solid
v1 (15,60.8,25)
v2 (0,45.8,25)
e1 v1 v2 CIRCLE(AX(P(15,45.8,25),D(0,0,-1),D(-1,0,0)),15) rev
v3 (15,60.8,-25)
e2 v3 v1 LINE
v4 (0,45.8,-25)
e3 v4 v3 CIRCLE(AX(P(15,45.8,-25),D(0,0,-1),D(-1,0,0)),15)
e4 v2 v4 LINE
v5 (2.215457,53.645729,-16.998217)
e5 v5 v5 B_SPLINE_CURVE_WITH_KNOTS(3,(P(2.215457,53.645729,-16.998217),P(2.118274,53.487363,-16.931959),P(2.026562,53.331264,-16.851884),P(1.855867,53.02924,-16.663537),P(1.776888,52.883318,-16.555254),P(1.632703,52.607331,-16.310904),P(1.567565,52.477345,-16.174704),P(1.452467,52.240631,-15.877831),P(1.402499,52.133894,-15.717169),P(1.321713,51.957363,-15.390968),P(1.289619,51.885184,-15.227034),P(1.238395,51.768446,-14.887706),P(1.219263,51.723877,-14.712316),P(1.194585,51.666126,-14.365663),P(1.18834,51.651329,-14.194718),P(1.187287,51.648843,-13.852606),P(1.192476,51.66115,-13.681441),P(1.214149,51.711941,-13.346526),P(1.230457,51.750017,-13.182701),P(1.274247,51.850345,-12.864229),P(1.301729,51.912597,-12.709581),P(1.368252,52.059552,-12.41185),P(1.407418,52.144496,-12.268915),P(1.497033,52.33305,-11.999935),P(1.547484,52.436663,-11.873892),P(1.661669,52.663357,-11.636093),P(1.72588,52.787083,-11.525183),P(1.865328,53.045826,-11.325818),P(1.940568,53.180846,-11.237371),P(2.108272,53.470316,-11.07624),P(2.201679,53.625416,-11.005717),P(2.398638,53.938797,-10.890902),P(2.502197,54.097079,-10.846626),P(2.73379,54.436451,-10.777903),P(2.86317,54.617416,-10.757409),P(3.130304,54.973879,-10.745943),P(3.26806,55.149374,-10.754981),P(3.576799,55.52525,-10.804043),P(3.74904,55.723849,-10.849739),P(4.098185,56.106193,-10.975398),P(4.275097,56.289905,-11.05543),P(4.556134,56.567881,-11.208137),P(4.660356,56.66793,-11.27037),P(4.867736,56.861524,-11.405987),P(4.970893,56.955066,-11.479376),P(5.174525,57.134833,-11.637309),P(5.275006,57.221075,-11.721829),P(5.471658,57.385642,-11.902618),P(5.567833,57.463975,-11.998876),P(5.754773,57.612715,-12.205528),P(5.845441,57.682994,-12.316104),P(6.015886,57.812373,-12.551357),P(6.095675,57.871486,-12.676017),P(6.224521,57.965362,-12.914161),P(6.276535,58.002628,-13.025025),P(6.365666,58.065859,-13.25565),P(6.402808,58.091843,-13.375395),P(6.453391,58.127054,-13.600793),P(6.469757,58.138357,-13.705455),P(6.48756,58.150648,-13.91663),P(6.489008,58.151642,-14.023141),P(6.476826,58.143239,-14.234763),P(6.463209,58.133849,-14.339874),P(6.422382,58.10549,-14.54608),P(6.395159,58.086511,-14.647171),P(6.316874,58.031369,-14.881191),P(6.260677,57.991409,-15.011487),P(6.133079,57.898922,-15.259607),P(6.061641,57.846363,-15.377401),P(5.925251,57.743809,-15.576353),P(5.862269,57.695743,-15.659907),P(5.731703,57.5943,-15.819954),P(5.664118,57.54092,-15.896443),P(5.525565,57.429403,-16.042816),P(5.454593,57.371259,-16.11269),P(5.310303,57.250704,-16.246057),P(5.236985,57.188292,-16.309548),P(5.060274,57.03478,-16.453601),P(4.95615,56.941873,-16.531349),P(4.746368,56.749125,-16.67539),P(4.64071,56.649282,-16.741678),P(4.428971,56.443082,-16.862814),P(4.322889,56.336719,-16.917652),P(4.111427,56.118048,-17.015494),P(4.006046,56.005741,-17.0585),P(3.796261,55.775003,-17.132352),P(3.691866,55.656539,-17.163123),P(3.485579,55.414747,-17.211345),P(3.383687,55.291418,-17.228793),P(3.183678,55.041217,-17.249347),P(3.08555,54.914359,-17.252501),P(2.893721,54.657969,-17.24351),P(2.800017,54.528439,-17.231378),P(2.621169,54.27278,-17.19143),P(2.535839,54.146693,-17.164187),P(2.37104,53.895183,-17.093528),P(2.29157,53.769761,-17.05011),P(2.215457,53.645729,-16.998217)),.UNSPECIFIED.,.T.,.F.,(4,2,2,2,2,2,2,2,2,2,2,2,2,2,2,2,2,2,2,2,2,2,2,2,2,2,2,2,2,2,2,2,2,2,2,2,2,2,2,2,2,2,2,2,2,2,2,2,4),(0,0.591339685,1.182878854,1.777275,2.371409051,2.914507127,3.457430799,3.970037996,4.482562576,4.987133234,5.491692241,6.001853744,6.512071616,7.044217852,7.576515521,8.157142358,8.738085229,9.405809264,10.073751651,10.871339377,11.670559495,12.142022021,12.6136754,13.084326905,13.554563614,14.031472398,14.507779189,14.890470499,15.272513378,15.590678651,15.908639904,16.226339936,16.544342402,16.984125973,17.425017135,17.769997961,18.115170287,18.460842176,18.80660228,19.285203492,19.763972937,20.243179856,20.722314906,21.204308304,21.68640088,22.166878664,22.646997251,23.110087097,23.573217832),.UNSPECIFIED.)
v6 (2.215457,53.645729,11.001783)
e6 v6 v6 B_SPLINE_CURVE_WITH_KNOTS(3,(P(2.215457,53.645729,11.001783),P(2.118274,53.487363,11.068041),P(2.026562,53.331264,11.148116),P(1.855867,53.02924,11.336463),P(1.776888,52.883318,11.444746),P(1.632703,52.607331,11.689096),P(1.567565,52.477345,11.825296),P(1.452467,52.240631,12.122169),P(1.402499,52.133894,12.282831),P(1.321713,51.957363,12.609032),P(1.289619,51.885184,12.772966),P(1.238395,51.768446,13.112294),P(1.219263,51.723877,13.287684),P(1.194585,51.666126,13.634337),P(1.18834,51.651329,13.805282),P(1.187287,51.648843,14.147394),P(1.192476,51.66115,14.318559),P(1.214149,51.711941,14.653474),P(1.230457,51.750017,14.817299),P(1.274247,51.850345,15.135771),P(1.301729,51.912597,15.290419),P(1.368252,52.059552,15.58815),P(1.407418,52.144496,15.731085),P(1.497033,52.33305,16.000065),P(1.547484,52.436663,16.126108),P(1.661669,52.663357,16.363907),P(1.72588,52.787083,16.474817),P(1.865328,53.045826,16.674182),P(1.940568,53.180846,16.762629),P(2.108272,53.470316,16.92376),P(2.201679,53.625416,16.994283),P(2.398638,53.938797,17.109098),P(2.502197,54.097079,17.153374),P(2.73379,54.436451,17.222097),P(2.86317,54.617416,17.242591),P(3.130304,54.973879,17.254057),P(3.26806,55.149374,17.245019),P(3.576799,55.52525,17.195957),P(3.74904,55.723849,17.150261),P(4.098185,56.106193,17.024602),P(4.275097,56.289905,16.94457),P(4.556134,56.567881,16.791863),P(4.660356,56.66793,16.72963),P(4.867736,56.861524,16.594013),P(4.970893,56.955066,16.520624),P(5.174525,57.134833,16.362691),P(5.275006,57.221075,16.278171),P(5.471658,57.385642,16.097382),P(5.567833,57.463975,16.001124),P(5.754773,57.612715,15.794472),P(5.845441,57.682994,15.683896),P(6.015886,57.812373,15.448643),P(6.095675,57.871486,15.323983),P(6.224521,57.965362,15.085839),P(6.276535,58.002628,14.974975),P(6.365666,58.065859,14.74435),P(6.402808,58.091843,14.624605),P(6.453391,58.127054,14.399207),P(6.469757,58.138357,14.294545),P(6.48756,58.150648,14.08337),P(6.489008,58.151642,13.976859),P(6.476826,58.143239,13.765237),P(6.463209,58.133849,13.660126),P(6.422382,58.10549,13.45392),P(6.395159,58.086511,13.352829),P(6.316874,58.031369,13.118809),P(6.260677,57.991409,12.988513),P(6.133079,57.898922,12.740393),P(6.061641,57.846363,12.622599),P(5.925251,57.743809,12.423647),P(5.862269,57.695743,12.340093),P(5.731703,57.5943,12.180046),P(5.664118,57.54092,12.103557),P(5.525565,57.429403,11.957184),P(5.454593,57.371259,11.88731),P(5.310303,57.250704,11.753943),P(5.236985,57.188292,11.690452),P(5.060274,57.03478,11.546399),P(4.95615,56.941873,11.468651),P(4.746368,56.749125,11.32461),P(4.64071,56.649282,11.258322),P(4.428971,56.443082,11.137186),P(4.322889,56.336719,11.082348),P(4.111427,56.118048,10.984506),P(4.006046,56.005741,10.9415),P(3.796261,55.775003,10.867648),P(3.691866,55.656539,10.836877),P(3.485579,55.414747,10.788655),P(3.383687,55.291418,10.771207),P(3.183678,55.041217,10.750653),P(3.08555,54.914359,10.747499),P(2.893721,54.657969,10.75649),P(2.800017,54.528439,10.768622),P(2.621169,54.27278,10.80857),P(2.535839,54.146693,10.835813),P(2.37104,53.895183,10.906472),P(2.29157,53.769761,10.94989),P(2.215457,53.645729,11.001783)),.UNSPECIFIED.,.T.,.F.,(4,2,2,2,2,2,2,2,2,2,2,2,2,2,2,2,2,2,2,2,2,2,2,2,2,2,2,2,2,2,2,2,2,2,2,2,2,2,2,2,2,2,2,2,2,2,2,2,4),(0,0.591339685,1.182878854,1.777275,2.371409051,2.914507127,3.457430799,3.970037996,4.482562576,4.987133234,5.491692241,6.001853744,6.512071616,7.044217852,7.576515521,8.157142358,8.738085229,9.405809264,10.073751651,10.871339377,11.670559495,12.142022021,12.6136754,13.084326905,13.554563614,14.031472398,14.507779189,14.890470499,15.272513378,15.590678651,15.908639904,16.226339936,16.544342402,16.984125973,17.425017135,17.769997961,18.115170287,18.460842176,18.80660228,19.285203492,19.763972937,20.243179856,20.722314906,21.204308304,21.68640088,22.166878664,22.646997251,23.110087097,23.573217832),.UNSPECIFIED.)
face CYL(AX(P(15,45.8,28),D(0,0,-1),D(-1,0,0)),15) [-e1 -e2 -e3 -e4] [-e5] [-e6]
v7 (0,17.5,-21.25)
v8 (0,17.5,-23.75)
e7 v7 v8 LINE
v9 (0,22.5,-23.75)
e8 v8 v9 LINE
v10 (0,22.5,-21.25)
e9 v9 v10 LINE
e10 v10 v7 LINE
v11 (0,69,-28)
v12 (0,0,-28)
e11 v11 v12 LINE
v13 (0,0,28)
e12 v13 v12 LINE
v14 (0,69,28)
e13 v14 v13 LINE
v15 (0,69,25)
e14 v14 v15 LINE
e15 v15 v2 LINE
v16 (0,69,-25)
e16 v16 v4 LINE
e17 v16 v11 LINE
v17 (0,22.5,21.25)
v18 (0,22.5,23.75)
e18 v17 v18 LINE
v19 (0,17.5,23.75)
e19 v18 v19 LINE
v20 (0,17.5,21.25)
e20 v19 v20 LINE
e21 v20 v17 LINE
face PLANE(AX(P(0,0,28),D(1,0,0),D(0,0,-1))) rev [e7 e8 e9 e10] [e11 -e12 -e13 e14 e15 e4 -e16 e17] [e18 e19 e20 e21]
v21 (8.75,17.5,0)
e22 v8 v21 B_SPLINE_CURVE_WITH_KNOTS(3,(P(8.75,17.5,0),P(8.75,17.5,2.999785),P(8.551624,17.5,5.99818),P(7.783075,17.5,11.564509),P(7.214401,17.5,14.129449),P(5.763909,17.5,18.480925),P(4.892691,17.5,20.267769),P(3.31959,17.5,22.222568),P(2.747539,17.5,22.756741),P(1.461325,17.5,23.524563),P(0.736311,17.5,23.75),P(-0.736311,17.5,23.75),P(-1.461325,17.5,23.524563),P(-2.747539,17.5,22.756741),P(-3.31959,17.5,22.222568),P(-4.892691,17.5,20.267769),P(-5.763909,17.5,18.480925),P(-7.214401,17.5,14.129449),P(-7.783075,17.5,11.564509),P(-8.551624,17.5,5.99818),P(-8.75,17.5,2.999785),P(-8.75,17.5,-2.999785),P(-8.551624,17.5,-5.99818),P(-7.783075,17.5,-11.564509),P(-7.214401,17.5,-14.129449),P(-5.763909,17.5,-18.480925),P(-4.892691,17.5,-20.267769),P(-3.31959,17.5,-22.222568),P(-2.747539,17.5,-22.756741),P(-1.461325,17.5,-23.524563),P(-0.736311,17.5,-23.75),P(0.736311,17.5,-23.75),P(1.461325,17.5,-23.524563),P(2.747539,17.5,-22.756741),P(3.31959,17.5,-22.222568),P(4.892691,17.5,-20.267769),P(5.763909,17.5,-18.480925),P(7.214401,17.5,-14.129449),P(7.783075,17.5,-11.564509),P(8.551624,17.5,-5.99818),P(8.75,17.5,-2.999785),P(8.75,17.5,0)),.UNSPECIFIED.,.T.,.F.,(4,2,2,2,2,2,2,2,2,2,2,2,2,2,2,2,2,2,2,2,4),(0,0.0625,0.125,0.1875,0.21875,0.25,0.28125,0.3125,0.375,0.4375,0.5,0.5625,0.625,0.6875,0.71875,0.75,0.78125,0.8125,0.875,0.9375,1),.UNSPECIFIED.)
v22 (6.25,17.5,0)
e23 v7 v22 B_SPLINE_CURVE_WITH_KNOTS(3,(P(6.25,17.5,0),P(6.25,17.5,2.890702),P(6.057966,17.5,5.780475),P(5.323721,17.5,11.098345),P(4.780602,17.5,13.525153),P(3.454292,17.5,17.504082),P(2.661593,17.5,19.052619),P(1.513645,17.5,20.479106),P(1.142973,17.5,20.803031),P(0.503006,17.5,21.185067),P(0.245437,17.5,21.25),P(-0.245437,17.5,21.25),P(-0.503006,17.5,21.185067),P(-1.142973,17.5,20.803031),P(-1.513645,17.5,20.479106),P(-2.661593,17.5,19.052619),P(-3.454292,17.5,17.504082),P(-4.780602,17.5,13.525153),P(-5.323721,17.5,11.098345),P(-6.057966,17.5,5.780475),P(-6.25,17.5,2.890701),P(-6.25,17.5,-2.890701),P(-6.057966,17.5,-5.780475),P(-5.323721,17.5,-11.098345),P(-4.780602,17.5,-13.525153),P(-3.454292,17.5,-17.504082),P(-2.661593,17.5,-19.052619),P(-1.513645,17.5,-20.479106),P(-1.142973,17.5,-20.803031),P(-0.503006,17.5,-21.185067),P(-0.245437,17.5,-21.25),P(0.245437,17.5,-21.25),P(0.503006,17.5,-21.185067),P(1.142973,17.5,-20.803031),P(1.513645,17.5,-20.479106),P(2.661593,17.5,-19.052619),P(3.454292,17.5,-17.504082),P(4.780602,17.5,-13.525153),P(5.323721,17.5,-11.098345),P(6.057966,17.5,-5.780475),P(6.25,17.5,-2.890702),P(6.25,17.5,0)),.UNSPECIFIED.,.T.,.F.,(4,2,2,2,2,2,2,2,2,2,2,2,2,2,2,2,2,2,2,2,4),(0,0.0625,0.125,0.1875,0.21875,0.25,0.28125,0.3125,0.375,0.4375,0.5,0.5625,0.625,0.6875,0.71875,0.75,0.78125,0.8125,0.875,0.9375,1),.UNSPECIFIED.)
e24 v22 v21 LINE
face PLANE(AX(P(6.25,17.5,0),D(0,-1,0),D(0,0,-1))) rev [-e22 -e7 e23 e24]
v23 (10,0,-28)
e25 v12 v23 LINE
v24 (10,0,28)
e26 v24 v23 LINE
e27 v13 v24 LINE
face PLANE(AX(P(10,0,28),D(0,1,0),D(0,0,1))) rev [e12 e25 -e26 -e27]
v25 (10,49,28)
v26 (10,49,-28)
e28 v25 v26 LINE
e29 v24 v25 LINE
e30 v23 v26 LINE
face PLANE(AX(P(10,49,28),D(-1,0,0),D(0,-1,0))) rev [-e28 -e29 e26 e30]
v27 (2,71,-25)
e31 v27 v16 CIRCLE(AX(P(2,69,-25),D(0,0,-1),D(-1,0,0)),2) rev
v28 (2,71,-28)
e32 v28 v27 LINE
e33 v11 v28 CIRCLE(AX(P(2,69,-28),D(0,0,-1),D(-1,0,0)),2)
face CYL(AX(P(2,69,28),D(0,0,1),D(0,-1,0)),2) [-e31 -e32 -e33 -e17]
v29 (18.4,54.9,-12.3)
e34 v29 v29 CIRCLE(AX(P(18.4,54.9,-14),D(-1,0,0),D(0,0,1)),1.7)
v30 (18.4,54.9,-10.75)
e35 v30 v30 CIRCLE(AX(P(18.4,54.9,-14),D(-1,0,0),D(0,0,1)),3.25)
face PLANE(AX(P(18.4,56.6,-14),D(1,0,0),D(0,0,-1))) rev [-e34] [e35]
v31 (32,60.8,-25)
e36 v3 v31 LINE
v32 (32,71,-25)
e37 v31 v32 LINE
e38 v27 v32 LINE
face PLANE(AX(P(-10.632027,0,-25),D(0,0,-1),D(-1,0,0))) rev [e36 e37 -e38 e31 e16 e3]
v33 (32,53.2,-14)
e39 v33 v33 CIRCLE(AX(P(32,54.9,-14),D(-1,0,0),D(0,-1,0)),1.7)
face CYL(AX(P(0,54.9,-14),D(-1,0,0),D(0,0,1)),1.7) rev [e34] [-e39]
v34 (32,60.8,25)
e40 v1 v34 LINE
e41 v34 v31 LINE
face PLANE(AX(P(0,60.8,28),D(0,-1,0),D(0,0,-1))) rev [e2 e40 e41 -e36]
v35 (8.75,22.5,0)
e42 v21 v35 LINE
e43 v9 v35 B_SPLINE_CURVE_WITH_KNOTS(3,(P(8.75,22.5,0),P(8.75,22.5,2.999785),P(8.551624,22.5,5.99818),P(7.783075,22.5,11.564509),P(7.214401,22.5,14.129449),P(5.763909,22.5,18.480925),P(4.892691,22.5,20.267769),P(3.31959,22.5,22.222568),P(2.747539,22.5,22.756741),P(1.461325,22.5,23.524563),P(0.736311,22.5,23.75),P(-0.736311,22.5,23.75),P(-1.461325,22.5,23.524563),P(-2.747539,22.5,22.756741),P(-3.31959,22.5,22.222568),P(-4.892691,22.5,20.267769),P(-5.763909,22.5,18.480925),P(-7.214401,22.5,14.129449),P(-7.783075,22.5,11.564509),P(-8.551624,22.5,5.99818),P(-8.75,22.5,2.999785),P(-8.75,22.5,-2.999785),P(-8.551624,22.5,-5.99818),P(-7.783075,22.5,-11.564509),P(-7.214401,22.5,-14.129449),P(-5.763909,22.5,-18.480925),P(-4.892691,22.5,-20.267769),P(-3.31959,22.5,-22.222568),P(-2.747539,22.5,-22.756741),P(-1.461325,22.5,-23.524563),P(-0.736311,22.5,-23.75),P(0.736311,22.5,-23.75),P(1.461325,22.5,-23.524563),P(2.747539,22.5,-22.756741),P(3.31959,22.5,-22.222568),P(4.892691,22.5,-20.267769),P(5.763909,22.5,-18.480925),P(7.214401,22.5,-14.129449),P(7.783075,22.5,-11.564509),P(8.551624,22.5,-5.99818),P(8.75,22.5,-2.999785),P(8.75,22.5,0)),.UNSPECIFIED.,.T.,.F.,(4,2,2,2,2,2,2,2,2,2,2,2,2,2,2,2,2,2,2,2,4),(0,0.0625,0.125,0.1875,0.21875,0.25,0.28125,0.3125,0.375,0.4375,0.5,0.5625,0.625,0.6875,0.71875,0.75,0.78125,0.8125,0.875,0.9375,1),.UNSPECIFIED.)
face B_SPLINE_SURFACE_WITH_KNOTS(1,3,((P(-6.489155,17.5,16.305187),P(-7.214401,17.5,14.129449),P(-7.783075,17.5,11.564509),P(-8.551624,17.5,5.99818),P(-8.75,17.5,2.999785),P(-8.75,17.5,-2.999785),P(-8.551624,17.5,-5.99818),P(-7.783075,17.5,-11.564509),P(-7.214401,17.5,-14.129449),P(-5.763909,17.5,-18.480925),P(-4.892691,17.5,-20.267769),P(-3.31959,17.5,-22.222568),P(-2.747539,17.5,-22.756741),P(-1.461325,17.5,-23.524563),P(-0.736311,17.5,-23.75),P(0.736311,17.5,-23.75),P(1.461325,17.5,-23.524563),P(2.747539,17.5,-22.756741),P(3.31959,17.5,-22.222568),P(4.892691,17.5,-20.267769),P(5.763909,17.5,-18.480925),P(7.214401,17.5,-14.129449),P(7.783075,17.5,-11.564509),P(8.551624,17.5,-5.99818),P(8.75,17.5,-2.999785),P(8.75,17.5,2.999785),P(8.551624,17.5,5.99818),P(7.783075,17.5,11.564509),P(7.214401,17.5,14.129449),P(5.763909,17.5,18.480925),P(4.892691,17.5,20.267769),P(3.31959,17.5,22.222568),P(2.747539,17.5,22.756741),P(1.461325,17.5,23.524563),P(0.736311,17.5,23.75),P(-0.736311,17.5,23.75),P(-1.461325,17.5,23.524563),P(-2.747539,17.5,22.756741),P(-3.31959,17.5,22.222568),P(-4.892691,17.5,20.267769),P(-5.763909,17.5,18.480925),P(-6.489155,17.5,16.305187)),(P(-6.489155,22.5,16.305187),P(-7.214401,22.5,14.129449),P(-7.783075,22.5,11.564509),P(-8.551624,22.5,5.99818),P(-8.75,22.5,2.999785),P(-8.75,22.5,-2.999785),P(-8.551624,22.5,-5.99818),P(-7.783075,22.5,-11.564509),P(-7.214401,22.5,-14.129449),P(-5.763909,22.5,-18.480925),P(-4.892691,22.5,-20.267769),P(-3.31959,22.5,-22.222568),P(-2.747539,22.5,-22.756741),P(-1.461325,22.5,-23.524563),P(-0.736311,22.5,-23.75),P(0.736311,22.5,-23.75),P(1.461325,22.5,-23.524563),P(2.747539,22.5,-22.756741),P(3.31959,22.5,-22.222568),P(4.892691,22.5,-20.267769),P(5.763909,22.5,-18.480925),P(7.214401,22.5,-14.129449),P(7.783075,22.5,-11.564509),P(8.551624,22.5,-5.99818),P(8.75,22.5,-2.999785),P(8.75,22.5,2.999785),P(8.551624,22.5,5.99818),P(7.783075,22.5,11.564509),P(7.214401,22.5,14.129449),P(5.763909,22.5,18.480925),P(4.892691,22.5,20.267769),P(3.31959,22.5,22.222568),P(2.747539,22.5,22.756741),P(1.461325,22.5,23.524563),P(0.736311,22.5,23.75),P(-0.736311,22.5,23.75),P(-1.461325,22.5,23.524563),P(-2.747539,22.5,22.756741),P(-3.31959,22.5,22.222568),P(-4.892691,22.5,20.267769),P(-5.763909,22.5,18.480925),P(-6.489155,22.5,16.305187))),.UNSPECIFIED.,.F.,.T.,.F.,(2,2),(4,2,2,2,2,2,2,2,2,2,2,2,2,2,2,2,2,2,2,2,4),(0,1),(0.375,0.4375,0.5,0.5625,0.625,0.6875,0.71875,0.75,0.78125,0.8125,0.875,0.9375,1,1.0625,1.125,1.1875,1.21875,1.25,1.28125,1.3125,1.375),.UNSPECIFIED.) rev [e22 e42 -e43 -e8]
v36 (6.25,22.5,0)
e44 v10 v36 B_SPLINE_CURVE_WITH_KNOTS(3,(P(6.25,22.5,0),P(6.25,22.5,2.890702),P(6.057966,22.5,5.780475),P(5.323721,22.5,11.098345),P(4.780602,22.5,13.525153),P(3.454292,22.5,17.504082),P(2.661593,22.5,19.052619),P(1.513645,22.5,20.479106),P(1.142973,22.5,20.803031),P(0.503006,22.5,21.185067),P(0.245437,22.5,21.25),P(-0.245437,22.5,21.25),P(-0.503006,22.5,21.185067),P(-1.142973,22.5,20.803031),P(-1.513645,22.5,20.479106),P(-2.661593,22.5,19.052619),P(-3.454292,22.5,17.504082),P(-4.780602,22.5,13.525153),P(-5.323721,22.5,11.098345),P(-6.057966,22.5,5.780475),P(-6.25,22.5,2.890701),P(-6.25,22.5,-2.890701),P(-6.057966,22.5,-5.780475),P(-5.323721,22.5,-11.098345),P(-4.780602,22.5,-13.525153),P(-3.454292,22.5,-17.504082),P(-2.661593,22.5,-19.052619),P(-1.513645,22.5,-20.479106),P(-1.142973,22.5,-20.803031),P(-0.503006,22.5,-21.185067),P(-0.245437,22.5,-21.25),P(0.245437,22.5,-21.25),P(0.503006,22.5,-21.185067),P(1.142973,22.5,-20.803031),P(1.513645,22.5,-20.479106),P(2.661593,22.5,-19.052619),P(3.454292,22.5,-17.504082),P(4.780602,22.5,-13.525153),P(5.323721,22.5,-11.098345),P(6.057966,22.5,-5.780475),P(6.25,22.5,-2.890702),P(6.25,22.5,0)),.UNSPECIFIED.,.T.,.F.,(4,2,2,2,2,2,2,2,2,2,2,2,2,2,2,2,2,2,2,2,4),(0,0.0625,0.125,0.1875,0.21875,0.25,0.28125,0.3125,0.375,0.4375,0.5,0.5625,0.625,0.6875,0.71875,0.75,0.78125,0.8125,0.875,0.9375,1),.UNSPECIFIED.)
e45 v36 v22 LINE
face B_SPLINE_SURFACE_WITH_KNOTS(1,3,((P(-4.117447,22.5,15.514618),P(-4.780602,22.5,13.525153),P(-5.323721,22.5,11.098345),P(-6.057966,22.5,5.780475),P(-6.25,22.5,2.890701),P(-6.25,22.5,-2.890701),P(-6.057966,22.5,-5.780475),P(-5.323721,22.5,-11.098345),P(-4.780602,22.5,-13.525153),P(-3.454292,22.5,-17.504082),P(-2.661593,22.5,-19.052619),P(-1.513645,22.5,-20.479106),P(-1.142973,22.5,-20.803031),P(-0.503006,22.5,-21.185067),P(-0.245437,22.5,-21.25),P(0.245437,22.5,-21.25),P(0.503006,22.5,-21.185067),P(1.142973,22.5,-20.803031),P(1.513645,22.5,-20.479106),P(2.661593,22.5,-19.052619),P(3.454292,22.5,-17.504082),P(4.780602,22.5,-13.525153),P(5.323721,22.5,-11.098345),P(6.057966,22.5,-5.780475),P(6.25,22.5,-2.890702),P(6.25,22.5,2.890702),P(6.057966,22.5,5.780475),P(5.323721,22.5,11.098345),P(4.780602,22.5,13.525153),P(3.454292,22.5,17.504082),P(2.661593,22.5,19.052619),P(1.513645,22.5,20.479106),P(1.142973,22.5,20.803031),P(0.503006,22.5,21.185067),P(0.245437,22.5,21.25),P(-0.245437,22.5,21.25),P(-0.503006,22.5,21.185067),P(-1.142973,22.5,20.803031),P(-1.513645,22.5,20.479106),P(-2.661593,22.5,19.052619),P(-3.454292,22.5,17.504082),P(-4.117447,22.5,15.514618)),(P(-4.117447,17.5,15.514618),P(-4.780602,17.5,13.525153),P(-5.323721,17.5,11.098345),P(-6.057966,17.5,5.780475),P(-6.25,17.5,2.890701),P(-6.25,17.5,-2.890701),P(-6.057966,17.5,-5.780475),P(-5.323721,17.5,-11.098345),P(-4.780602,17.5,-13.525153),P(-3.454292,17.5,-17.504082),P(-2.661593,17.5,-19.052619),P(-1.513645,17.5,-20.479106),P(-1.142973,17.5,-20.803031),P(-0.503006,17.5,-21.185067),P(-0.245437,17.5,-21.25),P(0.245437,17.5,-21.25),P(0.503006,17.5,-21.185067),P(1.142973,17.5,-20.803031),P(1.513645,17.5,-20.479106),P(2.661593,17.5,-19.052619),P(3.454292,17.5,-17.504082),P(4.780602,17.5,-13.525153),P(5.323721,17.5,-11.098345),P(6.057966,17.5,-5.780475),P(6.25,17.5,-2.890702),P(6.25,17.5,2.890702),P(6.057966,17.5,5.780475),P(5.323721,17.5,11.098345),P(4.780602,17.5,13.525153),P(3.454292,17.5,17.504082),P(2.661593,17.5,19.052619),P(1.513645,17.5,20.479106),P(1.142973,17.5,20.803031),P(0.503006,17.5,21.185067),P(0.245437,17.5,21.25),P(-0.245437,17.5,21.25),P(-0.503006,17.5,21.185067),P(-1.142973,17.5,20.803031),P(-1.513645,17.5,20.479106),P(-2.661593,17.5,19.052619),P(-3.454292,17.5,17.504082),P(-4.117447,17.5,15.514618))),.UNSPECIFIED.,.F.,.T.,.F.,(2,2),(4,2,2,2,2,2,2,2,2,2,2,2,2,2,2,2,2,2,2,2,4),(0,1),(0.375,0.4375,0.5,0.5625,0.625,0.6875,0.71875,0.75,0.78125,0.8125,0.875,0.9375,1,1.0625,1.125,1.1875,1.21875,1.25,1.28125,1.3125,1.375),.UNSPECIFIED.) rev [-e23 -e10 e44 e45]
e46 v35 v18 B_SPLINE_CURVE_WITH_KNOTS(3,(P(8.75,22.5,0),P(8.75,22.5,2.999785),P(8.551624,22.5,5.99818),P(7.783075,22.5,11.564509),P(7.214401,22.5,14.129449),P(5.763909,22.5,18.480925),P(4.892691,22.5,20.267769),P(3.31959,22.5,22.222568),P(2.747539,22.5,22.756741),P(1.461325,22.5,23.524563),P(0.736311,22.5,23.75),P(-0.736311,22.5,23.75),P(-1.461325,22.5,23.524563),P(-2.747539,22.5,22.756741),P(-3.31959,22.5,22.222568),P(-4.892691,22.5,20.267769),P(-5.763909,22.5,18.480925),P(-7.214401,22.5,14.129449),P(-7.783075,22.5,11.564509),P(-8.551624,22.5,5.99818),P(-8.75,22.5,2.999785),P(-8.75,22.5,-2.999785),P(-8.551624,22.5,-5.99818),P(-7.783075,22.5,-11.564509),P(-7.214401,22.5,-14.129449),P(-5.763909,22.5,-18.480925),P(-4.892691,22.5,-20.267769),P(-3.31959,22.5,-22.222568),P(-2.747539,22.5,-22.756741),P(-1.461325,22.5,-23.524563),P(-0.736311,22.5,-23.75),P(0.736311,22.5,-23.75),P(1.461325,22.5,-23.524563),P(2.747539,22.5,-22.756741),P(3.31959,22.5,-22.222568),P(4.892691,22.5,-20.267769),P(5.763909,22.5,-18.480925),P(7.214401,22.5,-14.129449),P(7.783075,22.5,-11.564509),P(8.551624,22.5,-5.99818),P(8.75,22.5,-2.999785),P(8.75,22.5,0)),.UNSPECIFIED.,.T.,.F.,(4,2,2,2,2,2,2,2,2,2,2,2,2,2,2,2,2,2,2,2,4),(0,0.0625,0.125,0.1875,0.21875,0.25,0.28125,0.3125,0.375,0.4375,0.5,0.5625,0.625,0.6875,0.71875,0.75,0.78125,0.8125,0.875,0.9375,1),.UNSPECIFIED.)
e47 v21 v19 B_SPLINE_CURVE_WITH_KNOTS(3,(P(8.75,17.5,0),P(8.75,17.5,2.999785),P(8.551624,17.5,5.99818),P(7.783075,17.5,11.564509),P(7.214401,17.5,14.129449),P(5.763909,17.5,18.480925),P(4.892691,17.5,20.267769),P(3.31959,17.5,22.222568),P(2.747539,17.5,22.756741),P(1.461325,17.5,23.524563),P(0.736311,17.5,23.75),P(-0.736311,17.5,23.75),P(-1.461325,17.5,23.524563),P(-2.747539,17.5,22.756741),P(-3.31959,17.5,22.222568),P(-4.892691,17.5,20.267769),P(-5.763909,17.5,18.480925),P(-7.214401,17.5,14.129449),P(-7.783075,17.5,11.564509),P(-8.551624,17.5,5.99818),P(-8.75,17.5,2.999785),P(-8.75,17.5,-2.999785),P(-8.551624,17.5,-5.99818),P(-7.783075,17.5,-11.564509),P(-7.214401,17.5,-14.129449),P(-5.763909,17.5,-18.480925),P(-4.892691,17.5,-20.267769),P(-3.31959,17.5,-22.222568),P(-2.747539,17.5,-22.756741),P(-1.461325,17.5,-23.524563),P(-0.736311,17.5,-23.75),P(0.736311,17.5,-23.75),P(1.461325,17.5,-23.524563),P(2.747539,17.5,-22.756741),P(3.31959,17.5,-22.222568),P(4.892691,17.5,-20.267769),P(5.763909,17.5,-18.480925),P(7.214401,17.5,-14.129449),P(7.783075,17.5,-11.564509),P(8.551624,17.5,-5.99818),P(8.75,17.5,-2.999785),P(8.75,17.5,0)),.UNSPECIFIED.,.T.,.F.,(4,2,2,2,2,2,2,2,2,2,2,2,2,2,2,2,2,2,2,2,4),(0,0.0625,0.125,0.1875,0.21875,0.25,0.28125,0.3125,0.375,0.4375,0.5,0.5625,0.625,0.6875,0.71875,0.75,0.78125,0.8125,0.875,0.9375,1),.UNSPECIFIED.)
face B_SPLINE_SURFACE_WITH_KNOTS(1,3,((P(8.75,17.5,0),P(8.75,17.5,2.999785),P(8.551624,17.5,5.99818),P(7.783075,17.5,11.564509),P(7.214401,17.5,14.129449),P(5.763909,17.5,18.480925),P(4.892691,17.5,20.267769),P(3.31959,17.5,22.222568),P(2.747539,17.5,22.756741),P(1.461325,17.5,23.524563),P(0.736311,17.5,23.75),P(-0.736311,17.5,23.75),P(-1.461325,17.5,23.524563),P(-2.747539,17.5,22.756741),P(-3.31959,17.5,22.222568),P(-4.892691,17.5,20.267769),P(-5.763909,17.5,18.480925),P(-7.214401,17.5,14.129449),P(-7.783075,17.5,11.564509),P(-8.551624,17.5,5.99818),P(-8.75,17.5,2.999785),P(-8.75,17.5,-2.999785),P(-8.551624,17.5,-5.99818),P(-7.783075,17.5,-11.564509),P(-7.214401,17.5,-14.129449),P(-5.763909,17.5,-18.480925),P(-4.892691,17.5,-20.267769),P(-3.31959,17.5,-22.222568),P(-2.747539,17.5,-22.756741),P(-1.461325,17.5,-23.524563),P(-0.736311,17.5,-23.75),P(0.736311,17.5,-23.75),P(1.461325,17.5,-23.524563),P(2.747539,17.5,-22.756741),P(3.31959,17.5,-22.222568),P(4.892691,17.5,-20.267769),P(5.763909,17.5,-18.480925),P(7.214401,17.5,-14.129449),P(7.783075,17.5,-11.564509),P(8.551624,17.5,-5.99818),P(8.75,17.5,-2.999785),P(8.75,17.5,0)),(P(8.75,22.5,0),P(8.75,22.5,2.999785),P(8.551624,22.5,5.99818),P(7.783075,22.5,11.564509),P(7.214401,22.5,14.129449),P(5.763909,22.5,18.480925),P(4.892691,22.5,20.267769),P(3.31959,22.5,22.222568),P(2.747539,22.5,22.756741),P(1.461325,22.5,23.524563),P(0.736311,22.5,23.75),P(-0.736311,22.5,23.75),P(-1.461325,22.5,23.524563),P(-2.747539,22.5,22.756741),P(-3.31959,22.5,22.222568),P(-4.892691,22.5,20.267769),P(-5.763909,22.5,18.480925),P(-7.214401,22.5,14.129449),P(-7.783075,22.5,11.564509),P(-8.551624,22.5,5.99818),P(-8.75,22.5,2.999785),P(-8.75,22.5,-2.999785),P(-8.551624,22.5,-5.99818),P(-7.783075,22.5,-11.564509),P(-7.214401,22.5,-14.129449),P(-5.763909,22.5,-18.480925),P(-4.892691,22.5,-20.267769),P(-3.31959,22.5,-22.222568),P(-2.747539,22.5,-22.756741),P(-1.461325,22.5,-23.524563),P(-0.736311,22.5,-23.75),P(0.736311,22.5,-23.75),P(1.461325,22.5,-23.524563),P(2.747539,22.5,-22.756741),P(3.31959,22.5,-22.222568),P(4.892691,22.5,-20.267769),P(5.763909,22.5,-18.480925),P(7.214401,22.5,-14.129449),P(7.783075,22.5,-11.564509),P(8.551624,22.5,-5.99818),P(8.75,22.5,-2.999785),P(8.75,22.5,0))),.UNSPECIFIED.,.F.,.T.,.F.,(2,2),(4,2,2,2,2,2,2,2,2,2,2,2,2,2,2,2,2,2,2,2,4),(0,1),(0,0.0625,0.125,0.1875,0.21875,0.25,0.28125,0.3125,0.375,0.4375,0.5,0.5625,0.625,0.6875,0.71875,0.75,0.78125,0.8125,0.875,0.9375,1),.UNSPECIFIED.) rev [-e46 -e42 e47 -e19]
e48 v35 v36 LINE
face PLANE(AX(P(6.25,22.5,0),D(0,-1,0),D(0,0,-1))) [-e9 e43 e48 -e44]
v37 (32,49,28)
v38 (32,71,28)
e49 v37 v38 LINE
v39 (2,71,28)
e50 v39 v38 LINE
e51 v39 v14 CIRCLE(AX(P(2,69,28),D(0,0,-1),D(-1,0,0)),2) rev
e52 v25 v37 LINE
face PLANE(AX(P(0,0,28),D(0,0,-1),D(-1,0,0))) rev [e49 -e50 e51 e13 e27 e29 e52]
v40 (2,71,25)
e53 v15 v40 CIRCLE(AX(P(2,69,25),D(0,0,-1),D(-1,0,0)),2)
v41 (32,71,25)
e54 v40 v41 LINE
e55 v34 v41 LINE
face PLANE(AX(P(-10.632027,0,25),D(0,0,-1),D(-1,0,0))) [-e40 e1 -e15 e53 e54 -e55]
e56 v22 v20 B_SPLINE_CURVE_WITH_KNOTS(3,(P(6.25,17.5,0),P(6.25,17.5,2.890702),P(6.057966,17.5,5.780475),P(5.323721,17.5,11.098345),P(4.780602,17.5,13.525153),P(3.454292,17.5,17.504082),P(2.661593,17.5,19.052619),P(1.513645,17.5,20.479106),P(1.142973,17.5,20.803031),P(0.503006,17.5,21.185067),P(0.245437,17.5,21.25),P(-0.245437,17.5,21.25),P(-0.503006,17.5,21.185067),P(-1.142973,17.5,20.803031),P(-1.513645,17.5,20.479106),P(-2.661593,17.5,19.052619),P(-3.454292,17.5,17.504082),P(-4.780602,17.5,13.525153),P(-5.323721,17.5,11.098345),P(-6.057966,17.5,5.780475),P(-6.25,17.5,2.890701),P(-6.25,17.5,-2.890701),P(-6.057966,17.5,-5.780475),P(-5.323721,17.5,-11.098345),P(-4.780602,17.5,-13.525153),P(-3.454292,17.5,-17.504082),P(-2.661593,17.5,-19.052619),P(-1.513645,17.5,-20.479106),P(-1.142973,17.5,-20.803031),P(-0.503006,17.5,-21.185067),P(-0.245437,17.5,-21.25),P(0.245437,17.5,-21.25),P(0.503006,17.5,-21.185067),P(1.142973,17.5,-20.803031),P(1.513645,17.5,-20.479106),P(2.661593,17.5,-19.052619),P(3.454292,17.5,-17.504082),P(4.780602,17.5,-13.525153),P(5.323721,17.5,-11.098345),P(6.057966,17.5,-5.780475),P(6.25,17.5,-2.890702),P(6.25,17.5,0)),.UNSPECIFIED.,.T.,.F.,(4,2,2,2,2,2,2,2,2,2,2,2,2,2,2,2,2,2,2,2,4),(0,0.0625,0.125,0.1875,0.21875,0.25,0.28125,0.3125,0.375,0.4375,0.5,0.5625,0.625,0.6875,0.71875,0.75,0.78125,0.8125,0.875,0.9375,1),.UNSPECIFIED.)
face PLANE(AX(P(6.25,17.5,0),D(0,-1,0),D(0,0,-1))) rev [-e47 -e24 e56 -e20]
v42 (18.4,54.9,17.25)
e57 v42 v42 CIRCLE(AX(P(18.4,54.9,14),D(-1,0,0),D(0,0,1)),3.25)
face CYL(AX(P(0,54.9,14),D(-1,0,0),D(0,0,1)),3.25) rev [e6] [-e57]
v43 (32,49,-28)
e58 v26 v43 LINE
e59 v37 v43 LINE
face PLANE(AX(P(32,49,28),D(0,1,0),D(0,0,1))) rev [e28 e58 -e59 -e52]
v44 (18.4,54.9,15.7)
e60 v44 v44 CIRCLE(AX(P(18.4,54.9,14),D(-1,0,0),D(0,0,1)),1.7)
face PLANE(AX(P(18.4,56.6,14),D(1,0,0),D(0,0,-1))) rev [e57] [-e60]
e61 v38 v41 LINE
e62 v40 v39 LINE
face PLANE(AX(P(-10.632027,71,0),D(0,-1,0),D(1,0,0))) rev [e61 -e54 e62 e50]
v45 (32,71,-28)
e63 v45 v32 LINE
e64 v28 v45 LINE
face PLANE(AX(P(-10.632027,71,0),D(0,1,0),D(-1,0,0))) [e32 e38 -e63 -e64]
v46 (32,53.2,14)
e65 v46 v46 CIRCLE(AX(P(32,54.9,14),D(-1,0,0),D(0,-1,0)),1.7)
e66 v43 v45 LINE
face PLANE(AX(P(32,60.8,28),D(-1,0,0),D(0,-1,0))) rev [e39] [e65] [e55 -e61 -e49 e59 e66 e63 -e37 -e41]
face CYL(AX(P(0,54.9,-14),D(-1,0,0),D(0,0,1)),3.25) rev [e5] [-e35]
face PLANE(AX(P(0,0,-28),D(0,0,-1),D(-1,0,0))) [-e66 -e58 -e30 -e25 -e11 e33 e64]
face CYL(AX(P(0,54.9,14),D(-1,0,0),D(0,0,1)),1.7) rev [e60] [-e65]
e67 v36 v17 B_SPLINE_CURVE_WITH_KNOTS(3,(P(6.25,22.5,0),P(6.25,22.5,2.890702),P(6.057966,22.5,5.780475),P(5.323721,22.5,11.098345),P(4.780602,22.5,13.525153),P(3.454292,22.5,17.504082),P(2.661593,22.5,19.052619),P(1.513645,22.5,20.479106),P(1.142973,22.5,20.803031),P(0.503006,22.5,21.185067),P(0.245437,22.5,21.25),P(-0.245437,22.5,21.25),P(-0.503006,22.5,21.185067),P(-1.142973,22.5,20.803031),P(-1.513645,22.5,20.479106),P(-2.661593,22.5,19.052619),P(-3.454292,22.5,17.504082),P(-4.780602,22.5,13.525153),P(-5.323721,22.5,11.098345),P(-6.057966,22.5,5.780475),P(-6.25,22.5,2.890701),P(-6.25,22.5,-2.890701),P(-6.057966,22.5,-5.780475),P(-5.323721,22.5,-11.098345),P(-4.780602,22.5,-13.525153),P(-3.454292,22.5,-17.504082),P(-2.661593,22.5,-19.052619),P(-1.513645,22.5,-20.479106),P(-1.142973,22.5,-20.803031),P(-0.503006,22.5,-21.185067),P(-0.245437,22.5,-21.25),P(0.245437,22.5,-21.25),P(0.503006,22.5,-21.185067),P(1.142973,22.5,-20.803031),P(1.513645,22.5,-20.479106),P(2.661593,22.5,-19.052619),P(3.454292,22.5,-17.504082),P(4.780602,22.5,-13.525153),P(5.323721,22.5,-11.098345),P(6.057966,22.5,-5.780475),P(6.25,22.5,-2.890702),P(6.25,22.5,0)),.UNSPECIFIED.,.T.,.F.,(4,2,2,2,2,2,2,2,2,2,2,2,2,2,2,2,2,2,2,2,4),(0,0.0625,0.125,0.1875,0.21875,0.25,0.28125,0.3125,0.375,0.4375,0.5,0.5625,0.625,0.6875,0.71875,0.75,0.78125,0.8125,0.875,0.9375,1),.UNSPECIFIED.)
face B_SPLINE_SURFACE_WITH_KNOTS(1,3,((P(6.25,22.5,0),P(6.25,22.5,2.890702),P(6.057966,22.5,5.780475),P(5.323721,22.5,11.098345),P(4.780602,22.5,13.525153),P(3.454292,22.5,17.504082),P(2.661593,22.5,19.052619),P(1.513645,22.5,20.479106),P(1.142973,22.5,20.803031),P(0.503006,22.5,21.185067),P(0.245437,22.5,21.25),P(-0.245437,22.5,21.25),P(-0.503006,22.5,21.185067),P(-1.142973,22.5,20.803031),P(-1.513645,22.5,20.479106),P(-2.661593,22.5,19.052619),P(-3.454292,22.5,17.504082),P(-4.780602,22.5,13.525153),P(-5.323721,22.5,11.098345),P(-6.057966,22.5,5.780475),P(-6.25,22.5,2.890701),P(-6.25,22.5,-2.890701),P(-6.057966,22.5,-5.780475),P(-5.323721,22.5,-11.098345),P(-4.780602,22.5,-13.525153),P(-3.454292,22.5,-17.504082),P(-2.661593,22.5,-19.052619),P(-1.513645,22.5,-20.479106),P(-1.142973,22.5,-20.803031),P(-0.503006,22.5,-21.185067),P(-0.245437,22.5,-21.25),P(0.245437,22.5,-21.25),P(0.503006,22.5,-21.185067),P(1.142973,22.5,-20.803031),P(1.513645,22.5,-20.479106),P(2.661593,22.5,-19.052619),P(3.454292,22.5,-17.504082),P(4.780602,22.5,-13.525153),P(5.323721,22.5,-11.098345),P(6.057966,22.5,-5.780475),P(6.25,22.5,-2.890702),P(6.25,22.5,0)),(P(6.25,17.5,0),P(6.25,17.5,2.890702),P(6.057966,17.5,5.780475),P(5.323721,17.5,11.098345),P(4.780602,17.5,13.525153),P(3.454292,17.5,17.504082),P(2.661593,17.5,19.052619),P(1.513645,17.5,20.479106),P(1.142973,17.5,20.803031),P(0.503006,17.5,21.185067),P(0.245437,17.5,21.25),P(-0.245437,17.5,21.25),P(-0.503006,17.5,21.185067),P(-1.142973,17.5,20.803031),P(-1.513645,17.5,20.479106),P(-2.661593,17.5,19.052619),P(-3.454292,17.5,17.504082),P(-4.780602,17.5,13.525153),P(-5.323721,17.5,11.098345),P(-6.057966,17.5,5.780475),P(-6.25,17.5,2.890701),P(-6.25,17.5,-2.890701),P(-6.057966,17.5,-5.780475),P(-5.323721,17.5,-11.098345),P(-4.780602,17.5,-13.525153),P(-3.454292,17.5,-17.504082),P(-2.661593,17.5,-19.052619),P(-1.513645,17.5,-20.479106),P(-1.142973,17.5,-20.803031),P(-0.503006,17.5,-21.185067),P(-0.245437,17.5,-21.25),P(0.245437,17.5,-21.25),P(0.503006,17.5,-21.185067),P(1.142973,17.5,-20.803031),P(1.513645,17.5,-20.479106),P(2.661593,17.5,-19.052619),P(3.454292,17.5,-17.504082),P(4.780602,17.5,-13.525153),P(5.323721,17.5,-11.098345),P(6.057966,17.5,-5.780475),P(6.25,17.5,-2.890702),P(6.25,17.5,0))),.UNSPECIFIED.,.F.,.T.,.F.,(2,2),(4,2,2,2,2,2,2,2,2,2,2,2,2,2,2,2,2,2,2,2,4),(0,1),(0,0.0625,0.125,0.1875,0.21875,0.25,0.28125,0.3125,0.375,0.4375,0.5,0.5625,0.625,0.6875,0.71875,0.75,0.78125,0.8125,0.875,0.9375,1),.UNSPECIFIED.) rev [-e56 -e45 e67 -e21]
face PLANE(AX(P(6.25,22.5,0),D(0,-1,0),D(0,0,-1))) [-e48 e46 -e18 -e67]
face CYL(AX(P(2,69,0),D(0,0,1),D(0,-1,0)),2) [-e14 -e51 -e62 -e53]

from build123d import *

# Parameters (mm, degrees)
BOSS_EXTRUDE1_DEPTH                                 = 28
CBORE_FOR_M3_HEX_SOCKET_HEAD_CAP_SCREW1_D           = 3.4
CBORE_FOR_M3_HEX_SOCKET_HEAD_CAP_SCREW1_CBORE_D     = 6.5
CBORE_FOR_M3_HEX_SOCKET_HEAD_CAP_SCREW1_CBORE_DEPTH = 18.4
SKETCH5_W                                           = 3
SKETCH5_H                                           = 10.2
BOSS_EXTRUDE3_DEPTH                                 = 32
FILLET1_R                                           = 15
CUT_SWEEP1_START                                    = 17.5
CUT_SWEEP1_DEPTH                                    = 5
FILLET2_R                                           = 2


# Read off the part's stored shape, not the designer's step: Cut-Sweep1
with BuildPart() as part:
    # Sketch1 → Boss-Extrude1 (new, symmetric)
    with BuildSketch(Plane.XY):
        Polygon((0, 0), (0, 60.8), (32, 60.8), (32, 49), (10, 49), (10, 0), align=None)
    extrude(amount=BOSS_EXTRUDE1_DEPTH, both=True)

    # CBORE for M3 Hex Socket Head Cap Screw1 (through all)
    with Locations(Plane.ZY):
        with Locations((14, 54.9), (-14, 54.9)):
            CounterBoreHole(CBORE_FOR_M3_HEX_SOCKET_HEAD_CAP_SCREW1_D / 2, CBORE_FOR_M3_HEX_SOCKET_HEAD_CAP_SCREW1_CBORE_D / 2, CBORE_FOR_M3_HEX_SOCKET_HEAD_CAP_SCREW1_CBORE_DEPTH)

    # Sketch5 → Boss-Extrude3 (add)
    with BuildSketch(Plane(origin=(32, 0, 0), x_dir=(0, 0, -1), z_dir=(1, 0, 0))):
        with Locations((-26.5, 65.9)):
            Rectangle(SKETCH5_W, SKETCH5_H)
        with Locations((26.5, 65.9)):
            Rectangle(SKETCH5_W, SKETCH5_H)
    extrude(amount=-BOSS_EXTRUDE3_DEPTH)

    # Fillet1
    # the kernel refuses this fillet: 15 mm, written as the material it takes off along each edge
    with BuildSketch(Plane(origin=(0, 60.8, 25), x_dir=(0, -1, 0), z_dir=(0, 0, -1))) as fillet1_piece_1:
        with BuildLine():
            CenterArc((FILLET1_R, -FILLET1_R), FILLET1_R, 90, 90)
            Line((0, -FILLET1_R), (0, 0))
            Line((0, 0), (FILLET1_R, 0))
        make_face()
    extrude(amount=50, mode=Mode.SUBTRACT)

    # Cut-Sweep1 outline → Cut-Sweep1 (cut)
    with BuildSketch(Plane(origin=(0, 0, 0), x_dir=(1, 0, 0), z_dir=(0, 1, 0)).offset(CUT_SWEEP1_START)):
        with BuildLine():
            add(Edge.make_bspline(
                [(0, 21.25), (0.24543691, 21.25), (0.503005998, 21.185067302), (1.142972539, 20.803030792), (1.513644961, 20.479106412), (2.661593441, 19.052618916), (3.454291906, 17.504082361), (4.780601567, 13.525153377), (5.323721278, 11.098345132), (6.057965891, 5.780475225), (6.25, 2.890701574), (6.25, -2.890701574), (6.057965891, -5.780475225), (5.323721278, -11.098345132), (4.780601567, -13.525153377), (3.454291906, -17.504082361), (2.661593441, -19.052618916), (1.513644961, -20.479106412), (1.142972539, -20.803030792), (0.503005998, -21.185067302), (0.24543691, -21.25), (0, -21.25)],
                knots=[0.75, 0.75, 0.75, 0.75, 0.78125, 0.78125, 0.8125, 0.8125, 0.875, 0.875, 0.9375, 0.9375, 1, 1, 1.0625, 1.0625, 1.125, 1.125, 1.1875, 1.1875, 1.21875, 1.21875, 1.25, 1.25, 1.25, 1.25], degree=3))
            Line((0, -21.25), (0, -23.75))
            add(Edge.make_bspline(
                [(0, -23.75), (0.736310661, -23.75), (1.461325008, -23.524563287), (2.747539499, -22.756740545), (3.319589998, -22.222568191), (4.892691098, -20.267768767), (5.763908978, -18.480925296), (7.214400985, -14.129449273), (7.783074584, -11.564508722), (8.551624223, -5.998179833), (8.75, -2.999784652), (8.75, 2.999784652), (8.551624223, 5.998179833), (7.783074584, 11.564508722), (7.214400985, 14.129449273), (5.763908978, 18.480925296), (4.892691098, 20.267768767), (3.319589998, 22.222568191), (2.747539499, 22.756740545), (1.461325008, 23.524563287), (0.736310661, 23.75), (0, 23.75)],
                knots=[0, 0, 0, 0, 0.03125, 0.03125, 0.0625, 0.0625, 0.125, 0.125, 0.1875, 0.1875, 0.25, 0.25, 0.3125, 0.3125, 0.375, 0.375, 0.4375, 0.4375, 0.46875, 0.46875, 0.5, 0.5, 0.5, 0.5], degree=3))
            Line((0, 23.75), (0, 21.25))
        make_face()
    extrude(amount=CUT_SWEEP1_DEPTH, mode=Mode.SUBTRACT)

    # Fillet2
    fillet2_edges = [part.edges().sort_by_distance(p)[0] for p in [
        (0, 71, 26.5),
        (0, 71, -26.5),
    ]]
    fillet(fillet2_edges, radius=FILLET2_R)


solid = part.part
